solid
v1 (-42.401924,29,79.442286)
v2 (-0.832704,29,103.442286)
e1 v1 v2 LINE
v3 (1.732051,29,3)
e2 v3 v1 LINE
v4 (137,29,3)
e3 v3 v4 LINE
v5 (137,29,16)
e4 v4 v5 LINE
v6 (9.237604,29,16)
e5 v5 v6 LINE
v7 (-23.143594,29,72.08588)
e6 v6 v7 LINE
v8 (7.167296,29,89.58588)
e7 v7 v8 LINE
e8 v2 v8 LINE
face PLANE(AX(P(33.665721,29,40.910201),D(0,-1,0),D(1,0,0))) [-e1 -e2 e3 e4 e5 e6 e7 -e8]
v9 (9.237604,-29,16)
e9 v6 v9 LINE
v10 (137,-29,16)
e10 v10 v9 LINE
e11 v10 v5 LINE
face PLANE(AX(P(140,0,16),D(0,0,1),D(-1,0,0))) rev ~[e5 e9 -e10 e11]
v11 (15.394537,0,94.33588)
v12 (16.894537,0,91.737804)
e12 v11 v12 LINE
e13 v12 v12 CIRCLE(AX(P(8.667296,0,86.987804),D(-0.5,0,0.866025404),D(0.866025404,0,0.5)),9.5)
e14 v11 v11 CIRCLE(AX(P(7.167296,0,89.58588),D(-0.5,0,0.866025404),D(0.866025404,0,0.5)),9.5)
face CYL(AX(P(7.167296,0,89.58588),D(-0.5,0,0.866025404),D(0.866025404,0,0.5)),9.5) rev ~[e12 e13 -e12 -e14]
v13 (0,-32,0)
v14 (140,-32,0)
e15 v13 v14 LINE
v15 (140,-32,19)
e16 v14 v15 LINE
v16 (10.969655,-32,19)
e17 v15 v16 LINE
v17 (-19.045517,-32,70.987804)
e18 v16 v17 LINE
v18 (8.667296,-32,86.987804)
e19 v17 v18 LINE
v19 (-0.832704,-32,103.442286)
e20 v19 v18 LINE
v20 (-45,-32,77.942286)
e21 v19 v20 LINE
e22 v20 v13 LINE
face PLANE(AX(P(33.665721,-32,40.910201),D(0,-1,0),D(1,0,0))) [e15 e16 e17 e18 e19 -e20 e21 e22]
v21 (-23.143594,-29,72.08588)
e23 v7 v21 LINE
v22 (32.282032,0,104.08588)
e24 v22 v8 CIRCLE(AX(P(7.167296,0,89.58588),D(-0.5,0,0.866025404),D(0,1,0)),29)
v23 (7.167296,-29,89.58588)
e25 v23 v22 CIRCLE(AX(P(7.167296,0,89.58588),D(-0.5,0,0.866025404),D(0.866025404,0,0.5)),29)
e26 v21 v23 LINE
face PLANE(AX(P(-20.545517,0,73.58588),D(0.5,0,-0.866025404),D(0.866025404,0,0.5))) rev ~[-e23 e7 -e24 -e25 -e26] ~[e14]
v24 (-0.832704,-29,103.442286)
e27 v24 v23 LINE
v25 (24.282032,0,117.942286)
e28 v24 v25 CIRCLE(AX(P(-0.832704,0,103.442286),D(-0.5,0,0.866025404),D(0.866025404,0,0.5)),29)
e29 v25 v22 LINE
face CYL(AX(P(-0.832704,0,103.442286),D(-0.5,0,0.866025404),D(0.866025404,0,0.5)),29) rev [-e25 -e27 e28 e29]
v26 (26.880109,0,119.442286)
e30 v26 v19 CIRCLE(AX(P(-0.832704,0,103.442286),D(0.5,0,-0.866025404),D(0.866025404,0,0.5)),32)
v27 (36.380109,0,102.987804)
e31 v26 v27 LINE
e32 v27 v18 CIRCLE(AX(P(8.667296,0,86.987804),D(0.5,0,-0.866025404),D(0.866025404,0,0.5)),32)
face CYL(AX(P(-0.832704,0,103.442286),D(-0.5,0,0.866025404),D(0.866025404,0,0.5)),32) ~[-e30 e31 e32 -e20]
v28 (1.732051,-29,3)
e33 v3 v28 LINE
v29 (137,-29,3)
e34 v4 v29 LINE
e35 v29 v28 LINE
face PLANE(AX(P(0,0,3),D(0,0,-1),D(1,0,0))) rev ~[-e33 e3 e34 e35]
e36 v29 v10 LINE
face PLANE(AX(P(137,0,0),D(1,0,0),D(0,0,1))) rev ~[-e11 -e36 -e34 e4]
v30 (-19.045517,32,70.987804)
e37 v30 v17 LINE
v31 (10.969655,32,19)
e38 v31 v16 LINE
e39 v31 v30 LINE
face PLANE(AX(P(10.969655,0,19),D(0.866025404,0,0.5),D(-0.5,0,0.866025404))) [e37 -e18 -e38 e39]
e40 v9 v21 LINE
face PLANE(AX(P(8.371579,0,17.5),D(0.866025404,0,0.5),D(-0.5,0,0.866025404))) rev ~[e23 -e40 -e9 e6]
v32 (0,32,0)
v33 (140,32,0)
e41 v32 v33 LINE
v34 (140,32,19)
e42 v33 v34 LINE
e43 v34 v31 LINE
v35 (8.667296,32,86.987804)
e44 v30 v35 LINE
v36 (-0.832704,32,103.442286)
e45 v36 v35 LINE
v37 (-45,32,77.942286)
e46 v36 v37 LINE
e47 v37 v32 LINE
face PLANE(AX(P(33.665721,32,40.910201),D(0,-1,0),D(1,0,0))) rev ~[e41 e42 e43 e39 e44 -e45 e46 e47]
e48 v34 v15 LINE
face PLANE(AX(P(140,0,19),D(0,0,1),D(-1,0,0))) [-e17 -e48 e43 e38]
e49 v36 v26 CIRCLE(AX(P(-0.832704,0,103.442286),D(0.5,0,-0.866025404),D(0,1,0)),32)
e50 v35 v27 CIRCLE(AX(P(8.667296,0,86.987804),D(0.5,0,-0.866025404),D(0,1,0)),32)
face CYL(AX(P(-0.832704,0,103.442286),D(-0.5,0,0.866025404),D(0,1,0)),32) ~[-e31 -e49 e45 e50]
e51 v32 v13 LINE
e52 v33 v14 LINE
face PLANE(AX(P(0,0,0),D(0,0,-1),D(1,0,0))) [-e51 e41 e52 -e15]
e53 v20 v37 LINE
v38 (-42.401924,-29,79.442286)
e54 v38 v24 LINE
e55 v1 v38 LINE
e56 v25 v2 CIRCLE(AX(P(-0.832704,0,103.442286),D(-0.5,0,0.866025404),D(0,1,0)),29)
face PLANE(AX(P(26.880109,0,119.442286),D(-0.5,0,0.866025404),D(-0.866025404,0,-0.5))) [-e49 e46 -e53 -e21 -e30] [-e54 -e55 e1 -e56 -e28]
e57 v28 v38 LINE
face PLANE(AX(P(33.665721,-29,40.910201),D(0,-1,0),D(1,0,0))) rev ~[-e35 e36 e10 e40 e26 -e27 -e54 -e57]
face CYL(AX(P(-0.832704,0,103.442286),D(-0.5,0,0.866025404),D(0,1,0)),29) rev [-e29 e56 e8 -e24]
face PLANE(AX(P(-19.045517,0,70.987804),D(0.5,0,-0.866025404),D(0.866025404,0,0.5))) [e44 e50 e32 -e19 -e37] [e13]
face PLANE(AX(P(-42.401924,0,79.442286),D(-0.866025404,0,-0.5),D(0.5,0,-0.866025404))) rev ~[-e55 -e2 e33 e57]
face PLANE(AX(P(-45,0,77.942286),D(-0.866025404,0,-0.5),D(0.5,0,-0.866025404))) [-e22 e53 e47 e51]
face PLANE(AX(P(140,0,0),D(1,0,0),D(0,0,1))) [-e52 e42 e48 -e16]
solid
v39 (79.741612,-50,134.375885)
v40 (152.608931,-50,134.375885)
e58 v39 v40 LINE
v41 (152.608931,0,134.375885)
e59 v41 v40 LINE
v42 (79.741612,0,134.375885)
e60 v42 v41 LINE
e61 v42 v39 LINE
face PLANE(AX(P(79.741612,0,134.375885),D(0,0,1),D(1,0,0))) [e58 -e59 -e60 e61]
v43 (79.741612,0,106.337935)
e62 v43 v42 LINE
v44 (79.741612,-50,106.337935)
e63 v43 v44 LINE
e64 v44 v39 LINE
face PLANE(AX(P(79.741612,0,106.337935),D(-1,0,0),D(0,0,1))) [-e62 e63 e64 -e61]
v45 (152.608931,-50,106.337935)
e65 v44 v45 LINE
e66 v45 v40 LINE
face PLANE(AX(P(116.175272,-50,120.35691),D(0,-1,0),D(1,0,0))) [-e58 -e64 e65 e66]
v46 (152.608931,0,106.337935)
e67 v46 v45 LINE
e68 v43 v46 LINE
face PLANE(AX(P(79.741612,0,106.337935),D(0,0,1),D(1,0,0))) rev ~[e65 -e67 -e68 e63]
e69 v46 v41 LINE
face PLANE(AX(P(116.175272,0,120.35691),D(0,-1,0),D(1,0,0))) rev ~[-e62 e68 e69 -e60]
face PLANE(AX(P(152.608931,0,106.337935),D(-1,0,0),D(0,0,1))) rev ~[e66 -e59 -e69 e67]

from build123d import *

# Parameters (mm, degrees)
F1_DEPTH = 32
F3_DEPTH = 19
F4_T     = -3
F5_R     = 9.5
F6_DEPTH = 3
F7_W     = 72.8673189878
F7_H     = 28.0379503965
F8_DEPTH = 50


# Not quite as in the source:
# - a feature names something its author has since deleted; it is built from what else it names


with BuildPart() as f1:
    # F0 (on Front) → F1 (new body, symmetric)
    with BuildSketch(Plane.XZ):
        Polygon((-45, 77.9422863406), (0, 0), (140, 0), (140, 19), (10.9696551146, 19), (-19.0455173281, 70.9878036687), (36.3801085141, 102.9878036687), (26.8801085141, 119.4422863406), align=None)
    extrude(amount=F1_DEPTH, both=True)

    # F2 (on face) → F3 (cut, through all)
    with BuildSketch(Plane(origin=(-45, 0, 77.9422863406), x_dir=(0.8660254038, 0, 0.5), z_dir=(-0.5, 0, 0.8660254038))):
        with BuildLine():
            Line((83, -32), (83, 0))
            ThreePointArc((83, 0), (73.627416998, -22.627416998), (51, -32))
            Line((51, -32), (83, -32))
        make_face()
        with BuildLine():
            ThreePointArc((51, 32), (73.627416998, 22.627416998), (83, 0))
            Line((83, 0), (83, 32))
            Line((83, 32), (51, 32))
        make_face()
    extrude(amount=-F3_DEPTH, mode=Mode.SUBTRACT)

    # F4
    f4_openings = [f1.faces().sort_by_distance(p)[0] for p in [
        (-11.74342, 0, 97.142982),
    ]]
    offset(amount=F4_T, openings=f4_openings, kind=Kind.INTERSECTION)

    # F5 (on face) → F6 (cut, through all)
    with BuildSketch(Plane(origin=(-37, 0, 64.08587988), x_dir=(0.8660254038, 0, 0.5), z_dir=(-0.5, 0, 0.8660254038))):
        with Locations((51, 0)):
            Circle(F5_R)
    extrude(amount=-F6_DEPTH, mode=Mode.SUBTRACT)


with BuildPart() as f8:
    # F7 (on Front) → F8 (new body)
    with BuildSketch(Plane.XZ):
        with Locations((116.1752715707, 120.3569099307)):
            Rectangle(F7_W, F7_H)
    extrude(amount=F8_DEPTH)


solid = Compound([f1.part, f8.part])
